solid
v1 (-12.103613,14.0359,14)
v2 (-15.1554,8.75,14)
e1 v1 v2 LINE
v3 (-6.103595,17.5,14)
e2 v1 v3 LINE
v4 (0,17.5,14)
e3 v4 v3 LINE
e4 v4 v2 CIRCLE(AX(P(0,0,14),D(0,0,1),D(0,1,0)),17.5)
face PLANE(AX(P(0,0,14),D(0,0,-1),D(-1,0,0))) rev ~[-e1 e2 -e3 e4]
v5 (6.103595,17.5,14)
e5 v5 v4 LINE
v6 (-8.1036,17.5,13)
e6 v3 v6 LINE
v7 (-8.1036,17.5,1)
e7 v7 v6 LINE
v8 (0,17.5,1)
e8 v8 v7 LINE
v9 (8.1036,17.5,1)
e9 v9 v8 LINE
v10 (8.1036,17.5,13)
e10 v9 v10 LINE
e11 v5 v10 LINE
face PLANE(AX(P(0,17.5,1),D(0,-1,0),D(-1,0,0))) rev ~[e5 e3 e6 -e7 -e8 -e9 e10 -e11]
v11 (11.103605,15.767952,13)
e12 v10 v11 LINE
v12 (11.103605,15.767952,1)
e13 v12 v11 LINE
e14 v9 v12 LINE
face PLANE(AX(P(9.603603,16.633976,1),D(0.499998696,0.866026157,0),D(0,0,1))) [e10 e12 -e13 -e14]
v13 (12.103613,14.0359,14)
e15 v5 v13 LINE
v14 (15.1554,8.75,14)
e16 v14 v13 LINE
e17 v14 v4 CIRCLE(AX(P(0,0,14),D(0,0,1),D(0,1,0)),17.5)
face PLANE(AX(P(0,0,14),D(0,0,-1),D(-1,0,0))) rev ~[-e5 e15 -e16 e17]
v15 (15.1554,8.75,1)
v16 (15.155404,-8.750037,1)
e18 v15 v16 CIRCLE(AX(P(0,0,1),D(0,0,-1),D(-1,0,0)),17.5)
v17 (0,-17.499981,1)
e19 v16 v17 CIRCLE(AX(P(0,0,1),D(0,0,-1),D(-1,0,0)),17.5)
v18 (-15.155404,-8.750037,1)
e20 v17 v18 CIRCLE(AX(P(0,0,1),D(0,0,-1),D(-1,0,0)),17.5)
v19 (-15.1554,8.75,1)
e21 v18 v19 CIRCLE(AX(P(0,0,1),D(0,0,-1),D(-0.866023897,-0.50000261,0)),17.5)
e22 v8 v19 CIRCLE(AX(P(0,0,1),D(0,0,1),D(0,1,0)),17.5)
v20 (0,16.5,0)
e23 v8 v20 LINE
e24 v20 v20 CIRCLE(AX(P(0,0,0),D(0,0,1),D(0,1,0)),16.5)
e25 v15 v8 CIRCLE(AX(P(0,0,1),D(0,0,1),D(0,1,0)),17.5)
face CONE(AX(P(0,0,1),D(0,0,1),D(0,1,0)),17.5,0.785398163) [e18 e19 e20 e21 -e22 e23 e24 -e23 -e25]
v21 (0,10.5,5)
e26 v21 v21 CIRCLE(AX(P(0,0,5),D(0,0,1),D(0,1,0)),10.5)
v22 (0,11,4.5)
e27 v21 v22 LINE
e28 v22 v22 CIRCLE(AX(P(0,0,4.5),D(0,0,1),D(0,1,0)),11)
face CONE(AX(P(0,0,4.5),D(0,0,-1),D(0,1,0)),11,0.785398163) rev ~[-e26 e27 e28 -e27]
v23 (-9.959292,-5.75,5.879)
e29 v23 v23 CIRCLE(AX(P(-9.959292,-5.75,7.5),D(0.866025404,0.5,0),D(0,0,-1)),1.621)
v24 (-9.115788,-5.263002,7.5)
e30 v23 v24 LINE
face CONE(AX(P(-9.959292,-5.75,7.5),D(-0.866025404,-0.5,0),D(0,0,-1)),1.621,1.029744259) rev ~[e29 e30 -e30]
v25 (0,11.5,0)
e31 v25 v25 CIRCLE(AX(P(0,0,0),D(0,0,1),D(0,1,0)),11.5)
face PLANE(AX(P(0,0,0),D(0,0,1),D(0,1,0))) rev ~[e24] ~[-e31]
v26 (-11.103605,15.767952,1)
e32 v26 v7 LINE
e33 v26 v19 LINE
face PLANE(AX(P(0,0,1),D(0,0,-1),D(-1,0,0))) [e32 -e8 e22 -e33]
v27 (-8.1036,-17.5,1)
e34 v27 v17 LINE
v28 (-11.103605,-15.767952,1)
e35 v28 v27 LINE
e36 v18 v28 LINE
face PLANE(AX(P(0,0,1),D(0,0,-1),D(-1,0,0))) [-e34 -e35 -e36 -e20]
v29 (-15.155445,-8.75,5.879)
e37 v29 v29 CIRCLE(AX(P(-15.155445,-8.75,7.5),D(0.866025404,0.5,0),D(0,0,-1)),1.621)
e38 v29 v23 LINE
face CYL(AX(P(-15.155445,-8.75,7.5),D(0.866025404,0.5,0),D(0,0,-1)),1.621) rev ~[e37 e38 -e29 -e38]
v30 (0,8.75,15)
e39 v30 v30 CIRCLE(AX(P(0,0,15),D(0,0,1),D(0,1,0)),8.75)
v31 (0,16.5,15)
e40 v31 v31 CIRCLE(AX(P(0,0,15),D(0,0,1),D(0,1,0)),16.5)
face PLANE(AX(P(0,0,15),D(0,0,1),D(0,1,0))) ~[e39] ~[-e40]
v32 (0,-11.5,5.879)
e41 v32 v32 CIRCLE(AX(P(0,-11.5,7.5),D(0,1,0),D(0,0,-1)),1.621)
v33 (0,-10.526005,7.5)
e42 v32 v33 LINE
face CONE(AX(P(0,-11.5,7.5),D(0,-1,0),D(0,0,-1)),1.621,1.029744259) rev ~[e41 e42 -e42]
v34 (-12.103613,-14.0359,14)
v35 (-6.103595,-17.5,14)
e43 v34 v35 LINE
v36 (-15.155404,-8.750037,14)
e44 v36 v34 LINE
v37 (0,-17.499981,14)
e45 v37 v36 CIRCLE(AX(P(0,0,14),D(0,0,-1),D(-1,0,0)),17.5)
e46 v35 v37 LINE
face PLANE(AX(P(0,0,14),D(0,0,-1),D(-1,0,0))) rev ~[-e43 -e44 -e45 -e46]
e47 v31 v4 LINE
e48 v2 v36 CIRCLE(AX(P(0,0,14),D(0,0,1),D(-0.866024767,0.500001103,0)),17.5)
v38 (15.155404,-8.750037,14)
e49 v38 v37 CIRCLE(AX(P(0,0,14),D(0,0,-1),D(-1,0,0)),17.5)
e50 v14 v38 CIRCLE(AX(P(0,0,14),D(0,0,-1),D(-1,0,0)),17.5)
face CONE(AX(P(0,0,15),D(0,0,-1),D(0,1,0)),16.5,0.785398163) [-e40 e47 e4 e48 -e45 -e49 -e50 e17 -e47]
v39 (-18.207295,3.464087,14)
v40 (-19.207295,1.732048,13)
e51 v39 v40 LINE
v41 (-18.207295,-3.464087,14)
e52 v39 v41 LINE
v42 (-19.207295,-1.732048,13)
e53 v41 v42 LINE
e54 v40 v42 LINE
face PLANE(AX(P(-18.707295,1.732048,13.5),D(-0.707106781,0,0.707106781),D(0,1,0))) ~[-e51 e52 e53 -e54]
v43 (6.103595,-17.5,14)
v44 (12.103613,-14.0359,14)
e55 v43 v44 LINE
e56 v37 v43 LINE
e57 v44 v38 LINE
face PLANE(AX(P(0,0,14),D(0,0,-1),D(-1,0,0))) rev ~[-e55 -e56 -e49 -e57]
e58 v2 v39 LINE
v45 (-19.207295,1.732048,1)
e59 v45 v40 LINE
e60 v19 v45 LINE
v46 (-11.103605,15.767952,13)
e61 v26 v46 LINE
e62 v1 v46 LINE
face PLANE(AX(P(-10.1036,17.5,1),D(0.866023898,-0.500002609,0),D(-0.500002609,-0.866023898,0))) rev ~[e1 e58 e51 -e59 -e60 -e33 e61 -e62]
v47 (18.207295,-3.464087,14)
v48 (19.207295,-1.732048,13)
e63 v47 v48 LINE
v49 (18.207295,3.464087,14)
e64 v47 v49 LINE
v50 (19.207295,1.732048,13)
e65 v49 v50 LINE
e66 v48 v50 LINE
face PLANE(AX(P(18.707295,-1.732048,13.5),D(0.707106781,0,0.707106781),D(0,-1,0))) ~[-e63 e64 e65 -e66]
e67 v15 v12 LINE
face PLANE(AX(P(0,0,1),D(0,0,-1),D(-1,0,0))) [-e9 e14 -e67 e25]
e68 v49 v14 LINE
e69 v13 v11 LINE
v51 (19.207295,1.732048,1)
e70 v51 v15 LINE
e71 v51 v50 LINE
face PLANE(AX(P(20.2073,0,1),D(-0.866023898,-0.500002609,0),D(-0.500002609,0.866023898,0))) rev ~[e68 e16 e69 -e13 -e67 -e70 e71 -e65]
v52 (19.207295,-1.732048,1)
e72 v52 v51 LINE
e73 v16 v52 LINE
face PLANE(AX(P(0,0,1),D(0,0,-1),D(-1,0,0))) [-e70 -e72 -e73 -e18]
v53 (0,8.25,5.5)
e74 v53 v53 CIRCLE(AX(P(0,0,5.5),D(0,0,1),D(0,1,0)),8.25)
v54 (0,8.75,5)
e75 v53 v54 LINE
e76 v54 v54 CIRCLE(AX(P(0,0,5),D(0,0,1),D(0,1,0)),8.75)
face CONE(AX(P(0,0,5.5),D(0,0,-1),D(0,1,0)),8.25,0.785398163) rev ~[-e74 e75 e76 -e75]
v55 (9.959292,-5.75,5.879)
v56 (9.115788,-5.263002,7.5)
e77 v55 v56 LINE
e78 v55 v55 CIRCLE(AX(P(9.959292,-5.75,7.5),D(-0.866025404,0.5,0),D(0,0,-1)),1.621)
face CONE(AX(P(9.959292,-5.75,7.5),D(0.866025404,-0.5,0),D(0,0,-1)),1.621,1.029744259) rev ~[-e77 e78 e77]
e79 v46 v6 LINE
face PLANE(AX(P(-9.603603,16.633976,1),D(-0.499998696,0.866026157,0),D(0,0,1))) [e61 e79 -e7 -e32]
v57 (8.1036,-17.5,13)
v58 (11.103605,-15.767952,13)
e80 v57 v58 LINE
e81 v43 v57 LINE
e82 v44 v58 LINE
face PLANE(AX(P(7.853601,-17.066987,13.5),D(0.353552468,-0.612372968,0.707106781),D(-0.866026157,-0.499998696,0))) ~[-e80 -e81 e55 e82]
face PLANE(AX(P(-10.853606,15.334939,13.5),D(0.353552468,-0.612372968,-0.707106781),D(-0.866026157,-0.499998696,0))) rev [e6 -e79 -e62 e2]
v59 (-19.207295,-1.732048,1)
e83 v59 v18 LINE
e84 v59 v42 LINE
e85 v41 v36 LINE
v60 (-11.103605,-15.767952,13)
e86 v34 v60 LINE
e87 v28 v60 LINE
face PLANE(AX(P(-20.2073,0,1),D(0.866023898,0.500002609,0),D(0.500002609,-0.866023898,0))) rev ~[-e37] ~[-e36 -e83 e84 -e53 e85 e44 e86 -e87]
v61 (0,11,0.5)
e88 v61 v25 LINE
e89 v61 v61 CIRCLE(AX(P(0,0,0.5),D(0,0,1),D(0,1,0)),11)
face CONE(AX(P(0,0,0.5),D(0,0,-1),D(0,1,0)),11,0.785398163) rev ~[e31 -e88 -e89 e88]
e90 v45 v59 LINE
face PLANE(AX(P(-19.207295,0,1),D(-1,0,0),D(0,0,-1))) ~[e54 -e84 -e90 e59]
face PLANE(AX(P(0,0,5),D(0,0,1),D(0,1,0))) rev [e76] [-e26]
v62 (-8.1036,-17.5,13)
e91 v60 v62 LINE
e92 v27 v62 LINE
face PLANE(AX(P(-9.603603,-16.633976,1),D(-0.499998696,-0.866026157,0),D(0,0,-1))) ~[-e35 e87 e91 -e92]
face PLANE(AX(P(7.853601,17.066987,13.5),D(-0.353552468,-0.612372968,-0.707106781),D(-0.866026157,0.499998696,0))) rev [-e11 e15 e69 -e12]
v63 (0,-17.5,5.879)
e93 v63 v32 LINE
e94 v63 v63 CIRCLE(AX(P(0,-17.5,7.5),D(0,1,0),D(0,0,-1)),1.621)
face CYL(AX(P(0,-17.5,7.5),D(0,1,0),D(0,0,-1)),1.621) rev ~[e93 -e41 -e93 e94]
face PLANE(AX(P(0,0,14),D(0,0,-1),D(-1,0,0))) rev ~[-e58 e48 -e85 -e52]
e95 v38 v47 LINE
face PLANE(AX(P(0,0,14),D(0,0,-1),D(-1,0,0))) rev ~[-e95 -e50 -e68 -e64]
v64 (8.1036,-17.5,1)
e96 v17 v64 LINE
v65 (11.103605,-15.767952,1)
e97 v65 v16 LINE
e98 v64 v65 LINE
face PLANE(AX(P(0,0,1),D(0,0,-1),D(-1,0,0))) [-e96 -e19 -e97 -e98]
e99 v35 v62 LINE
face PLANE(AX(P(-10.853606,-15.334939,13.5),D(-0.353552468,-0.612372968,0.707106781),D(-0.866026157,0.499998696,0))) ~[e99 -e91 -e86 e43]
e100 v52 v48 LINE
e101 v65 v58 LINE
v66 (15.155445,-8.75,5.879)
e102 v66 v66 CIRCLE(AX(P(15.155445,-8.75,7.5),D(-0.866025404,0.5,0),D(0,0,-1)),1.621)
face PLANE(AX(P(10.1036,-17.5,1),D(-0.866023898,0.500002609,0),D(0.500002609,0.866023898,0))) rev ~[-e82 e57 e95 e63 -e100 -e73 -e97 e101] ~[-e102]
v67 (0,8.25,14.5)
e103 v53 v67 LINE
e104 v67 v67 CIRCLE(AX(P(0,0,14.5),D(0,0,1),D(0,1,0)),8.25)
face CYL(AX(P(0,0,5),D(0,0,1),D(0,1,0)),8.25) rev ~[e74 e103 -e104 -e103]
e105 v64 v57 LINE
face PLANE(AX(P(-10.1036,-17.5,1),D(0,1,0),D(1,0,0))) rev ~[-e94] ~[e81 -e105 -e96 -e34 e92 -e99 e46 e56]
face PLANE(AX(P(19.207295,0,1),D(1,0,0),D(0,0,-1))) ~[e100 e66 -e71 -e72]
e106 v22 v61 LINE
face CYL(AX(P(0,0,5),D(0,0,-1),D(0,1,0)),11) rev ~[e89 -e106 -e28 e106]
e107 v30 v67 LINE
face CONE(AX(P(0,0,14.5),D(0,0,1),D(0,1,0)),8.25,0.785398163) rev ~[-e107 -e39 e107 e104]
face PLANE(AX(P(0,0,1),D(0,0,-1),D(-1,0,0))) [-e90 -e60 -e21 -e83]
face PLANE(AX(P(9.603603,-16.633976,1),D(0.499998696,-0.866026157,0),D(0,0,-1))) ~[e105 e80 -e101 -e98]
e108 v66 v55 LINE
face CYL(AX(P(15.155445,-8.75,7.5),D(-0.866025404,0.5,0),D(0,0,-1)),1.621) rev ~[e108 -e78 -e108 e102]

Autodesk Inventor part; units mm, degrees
ref_plane "YZ Plane" through (0, 0, 0) normal (1, 0, 0) x (0, 1, 0)
ref_plane "XZ Plane" through (0, 0, 0) normal (0, 1, 0) x (-1, 0, 0)
sketch "Esquisse1" plane through (0, 0, 0) normal (1, 0, 0) x (0, 1, 0)
  line L0 (0, 0) -> (0, 17.727)
  line L1 (8.25, 5) -> (8.25, 15)
  line L2 (8.25, 5) -> (11, 5)
  line L3 (11, 5) -> (11, 0)
  line L4 (17.5, 14) -> (17.5, 1)
  line L5 (16.5, 0) -> (11, 0)
  line L6 (8.25, 15) -> (16.5, 15)
  line L7 (16.5, 15) -> (17.5, 14)
  line L8 (17.5, 1) -> (16.5, 0)
  dimension "d1" = 16.5
  dimension "d2" = 22
  dimension "d3" = 35
  dimension "d4" = 5
  dimension "d71" = 1
  dimension "d72" = 1
  dimension "d77" = 1
  dimension "d78" = 1
  dimension "d82" = 15
revolve "Révolution1" add sketch "Esquisse1" angle 360 about axis through (0, 0, 0) along (0, 0, 1)
ref_plane "Plan de construction1" through (0, 0, 1) normal (0, 0, -1) x (-1, 0, 0)
sketch "Esquisse2" plane through (0, 0, 1) normal (0, 0, -1) x (-1, 0, 0)
  line L0 (10.1036, 17.5) -> (20.2073, 0)
  line L1 (20.2073, 0) -> (10.1036, -17.5)
  line L2 (10.1036, -17.5) -> (-10.1036, -17.5)
  line L3 (-10.1036, -17.5) -> (-20.2073, 0)
  line L4 (-20.2073, 0) -> (-10.1036, 17.5)
  line L5 (-10.1036, 17.5) -> (10.1036, 17.5)
  circle A0 centre (0, 0) radius 17.5 projected
  arc A1 (-15.1554, 8.75) -> (15.1554, 8.75) centre (0, 0) ccw
extrude "Extrusion1" add sketch "Esquisse2" against normal blind 13 contours L0 A0 L5 | L0 L1 A0 | A0 L4 L5 | A0 L3 L4 | L1 L2 A0 | A0 L2 L3
chamfer "Chanfrein1" distance 0.5 angle 45 2 edges at (0, -11, 0) (0, -11, 5)
chamfer "Chanfrein2" distance 2 angle 45 6 edges at (10.1036, 17.5, 7.5) (20.2073, 0, 7.5) (10.1036, -17.5, 7.5) (-10.1036, -17.5, 7.5) (-20.2073, 0, 7.5) (-10.1036, 17.5, 7.5)
sketch "Esquisse3" plane through (-8.1036, -17.5, 1) normal (0, -1, 0) x (1, 0, 0)
  line L0 (0, 13) -> (16.2073, 13) projected
  line L1 (-8.3964, -1) -> (24.6036, -1) projected
  line L2 (0, 0) -> (0, 13) projected
  point P0 (8.1036, -1)
  point P1 (8.1036, 6.5)
  point P2 (8.1036, 0)
  point P3 (16.2073, 0)
  point P4 (8.1036, 0)
  point P5 (8.1036, 13)
  point P6 (0, 6.5)
hole "Perçage1" at (0, -17.5, 7.5) direction (0, 1, 0) diameter 3.242 depth 6 tip angle 118 thread size "M4x0.7" class "6H" standard "ISO Metric profile"
chamfer "Chanfrein4" distance 0.5 angle 45 2 edges at (0, -8.25, 15) (0, -8.25, 5)
chamfer "Chanfrein5" distance 1 angle 45 6 edges at (9.6036, 16.634, 14) (19.2073, 0, 14) (9.6036, -16.634, 14) (-9.6036, -16.634, 14) (-19.2073, 0, 14) (-9.6036, 16.634, 14)
pattern_circular "Réseau circulaire2" count 3 over 120 about axis through (0, 0, -10) along (0, 0, 1) of "Perçage1" both ways yes
equation "\"d72\" = d71"
equation "\"d78\" = d77"
properties part number "support_canon" material "Aluminium 6061"
